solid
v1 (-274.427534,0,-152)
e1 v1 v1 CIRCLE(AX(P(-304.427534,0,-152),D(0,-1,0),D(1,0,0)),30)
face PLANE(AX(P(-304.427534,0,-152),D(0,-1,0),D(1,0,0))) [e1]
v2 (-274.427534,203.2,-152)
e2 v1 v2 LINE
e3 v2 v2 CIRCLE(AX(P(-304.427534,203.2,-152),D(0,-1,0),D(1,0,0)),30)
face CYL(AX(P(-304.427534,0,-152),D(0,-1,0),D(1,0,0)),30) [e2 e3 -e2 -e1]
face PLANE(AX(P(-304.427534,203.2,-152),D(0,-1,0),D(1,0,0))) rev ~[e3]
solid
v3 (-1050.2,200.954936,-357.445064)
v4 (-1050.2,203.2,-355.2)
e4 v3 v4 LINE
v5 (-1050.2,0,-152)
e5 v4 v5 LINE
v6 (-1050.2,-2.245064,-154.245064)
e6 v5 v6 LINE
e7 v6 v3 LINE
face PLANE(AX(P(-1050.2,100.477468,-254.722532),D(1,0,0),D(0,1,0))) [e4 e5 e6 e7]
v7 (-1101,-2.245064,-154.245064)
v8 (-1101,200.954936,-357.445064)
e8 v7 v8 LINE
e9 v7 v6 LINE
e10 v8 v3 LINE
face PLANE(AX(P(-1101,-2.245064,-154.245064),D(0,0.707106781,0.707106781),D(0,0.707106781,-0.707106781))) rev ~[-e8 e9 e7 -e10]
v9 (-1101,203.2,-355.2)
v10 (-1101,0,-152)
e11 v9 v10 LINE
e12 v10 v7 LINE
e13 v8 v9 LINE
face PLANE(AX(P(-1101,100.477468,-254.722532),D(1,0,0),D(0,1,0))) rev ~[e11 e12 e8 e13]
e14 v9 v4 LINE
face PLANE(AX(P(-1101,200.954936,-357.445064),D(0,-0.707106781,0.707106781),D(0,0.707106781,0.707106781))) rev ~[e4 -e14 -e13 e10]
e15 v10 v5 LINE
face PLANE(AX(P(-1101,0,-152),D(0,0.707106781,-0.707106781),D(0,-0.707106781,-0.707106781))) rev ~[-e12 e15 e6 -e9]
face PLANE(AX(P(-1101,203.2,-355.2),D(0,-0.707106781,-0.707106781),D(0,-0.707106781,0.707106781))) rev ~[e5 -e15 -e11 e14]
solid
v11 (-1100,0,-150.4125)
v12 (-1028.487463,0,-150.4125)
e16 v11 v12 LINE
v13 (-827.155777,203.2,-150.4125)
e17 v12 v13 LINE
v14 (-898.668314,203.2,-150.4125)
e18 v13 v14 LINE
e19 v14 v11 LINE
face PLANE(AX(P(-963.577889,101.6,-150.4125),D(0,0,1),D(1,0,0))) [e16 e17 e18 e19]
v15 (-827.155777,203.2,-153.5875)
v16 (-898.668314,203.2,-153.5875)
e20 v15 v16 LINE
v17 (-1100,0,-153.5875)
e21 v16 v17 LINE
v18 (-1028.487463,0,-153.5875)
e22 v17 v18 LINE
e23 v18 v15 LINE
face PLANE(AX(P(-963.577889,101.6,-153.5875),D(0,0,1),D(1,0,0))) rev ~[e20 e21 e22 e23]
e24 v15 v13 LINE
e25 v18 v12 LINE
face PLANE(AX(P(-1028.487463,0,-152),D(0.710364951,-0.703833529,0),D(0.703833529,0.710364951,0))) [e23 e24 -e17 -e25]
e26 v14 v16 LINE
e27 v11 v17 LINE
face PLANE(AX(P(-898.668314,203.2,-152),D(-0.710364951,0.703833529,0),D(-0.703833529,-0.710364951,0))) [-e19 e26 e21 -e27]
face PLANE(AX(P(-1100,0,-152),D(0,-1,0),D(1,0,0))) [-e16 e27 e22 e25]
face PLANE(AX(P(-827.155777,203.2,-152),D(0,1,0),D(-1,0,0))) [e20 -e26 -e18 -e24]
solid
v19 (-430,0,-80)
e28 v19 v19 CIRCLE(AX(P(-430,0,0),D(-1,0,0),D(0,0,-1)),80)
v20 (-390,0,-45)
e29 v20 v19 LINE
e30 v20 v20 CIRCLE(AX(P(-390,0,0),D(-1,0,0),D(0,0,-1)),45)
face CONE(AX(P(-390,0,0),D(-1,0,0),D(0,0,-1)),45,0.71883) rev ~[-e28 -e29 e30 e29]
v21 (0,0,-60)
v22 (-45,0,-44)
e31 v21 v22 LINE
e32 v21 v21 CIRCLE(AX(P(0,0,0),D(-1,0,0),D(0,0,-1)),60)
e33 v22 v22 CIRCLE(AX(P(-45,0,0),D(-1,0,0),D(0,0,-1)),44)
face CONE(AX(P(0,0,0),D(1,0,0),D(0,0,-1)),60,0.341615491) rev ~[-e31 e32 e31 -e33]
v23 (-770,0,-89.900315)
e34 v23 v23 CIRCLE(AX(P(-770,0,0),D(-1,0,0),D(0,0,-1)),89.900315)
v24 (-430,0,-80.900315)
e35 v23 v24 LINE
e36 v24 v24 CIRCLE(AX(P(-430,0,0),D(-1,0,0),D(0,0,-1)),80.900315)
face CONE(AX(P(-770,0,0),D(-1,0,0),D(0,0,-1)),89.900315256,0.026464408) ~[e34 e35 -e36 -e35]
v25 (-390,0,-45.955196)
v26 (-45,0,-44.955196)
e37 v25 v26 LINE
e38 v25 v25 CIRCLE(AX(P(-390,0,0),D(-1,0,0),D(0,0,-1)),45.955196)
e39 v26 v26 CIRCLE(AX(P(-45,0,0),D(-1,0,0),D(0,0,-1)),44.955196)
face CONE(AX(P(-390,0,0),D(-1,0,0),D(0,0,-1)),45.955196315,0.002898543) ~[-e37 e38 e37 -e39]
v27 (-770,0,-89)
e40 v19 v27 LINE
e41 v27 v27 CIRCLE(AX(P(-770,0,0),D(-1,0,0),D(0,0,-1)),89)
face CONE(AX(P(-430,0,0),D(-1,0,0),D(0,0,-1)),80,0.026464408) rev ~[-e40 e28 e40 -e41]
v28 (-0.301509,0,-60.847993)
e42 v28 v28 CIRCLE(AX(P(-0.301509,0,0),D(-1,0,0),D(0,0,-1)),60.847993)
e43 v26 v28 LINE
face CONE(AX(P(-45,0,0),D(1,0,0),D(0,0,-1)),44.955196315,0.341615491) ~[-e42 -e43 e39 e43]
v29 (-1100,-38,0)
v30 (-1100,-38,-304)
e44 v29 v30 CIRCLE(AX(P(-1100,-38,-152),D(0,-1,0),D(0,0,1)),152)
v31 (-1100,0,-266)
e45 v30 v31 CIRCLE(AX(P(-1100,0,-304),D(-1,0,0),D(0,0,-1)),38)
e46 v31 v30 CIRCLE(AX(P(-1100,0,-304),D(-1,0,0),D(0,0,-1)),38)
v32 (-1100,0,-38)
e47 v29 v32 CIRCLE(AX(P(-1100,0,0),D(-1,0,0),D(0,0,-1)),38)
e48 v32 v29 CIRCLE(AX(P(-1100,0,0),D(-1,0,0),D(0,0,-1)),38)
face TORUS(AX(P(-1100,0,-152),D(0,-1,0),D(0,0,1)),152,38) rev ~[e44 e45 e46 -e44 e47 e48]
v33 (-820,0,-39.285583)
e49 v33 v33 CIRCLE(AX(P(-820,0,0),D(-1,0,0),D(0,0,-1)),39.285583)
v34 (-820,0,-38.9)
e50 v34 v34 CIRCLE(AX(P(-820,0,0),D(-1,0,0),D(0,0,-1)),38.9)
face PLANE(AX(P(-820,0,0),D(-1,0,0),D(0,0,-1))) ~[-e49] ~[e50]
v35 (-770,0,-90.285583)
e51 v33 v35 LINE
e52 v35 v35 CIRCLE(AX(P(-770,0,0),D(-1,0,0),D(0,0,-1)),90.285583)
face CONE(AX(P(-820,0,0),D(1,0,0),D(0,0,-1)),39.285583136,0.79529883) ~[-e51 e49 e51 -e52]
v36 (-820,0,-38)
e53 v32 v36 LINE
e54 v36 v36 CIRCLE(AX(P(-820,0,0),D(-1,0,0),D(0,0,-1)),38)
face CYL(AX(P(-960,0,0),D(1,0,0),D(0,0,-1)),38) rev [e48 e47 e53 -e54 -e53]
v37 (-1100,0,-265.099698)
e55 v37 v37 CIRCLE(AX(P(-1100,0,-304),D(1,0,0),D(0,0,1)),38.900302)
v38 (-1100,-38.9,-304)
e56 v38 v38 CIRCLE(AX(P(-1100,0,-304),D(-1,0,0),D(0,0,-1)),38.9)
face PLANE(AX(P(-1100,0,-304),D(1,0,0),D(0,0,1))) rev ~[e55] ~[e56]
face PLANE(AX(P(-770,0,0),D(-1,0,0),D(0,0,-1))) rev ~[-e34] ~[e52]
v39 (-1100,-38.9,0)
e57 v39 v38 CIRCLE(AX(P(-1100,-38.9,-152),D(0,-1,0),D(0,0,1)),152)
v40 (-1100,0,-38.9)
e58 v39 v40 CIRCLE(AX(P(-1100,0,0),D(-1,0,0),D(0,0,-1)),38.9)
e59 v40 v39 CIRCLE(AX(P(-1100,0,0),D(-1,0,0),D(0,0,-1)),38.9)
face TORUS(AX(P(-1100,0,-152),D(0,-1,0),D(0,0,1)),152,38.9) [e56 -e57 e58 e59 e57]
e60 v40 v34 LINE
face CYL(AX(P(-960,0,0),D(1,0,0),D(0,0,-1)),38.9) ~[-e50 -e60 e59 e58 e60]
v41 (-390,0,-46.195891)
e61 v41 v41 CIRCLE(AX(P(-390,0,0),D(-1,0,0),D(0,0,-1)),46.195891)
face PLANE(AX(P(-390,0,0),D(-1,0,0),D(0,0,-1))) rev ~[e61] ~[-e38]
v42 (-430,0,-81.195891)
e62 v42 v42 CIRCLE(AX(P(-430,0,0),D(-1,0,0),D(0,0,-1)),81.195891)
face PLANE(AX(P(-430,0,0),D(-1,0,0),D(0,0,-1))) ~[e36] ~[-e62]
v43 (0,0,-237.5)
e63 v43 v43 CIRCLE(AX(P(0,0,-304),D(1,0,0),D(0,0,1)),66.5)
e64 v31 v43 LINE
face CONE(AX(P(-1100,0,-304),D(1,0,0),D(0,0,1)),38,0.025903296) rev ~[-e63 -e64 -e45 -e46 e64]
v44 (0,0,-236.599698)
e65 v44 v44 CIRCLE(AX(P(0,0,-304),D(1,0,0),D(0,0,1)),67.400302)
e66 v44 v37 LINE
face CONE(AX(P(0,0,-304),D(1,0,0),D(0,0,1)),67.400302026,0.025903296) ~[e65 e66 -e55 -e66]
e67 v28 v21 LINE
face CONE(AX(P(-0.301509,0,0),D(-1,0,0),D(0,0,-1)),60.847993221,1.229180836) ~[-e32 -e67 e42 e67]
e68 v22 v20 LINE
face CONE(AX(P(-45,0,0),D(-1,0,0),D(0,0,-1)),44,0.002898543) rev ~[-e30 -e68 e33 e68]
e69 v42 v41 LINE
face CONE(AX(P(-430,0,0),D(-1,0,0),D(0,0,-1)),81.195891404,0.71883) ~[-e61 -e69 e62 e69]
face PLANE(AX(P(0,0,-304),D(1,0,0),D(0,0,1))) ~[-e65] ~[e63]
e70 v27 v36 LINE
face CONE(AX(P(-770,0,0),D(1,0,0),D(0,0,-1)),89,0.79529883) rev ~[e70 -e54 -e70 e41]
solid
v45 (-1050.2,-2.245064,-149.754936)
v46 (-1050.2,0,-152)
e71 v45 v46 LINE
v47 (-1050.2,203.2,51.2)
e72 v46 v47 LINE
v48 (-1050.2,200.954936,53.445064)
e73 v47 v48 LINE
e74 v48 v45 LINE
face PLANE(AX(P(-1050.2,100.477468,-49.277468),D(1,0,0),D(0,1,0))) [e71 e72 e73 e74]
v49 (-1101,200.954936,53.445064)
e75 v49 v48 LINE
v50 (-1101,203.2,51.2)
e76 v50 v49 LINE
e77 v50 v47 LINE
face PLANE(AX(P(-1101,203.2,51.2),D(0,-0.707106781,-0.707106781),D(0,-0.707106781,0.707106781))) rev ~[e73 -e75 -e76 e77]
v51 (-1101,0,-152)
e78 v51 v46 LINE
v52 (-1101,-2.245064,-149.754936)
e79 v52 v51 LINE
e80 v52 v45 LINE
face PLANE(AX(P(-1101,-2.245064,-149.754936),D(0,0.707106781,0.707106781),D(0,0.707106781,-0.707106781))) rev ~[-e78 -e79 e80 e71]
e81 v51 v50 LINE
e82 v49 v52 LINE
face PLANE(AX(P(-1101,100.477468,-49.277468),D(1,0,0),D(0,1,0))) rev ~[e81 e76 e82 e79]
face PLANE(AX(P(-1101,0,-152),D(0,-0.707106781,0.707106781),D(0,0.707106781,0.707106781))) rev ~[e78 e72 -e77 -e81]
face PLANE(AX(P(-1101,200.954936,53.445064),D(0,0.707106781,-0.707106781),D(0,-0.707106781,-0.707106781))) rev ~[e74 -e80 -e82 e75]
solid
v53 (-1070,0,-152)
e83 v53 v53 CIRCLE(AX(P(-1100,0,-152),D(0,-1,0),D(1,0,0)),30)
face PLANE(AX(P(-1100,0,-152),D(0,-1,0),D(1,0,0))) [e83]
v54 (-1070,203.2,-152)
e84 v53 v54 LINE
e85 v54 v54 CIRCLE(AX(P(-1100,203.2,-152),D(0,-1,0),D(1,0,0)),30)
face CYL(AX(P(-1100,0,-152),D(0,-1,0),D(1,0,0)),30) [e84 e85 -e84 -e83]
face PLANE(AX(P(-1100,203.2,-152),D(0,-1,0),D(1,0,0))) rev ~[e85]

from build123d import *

# Parameters (mm, degrees)
F0_W        = 280
F0_H        = 0.9
F1_FACE_R   = 38.9
F1_FACE_R_2 = 38
F0_R        = 30
F4_DEPTH    = 203.2
F7_DEPTH    = 50.8
F10_DEPTH   = 1.5875


# Not quite as in the source:
# - a length typed as a fraction of an inch, garbled in the dataset ("3 / 203.2 mm" for 3/8 in), is restored


with BuildPart() as f1:
    # F0 (on Front) → F1 (revolve)
    with BuildSketch(Plane.XZ):
        Polygon((-0.3015087009, -60.8479932213), (0, -60), (-45, -44), (-45, -44.9551963149), align=None)
        Polygon((-45, -44.9551963149), (-45, -44), (-390, -45), (-390, -45.9551963149), align=None)
        Polygon((-390, -45.9551963149), (-390, -45), (-430, -80), (-430, -80.9003152562), (-430, -81.1958914039), (-390, -46.1958914039), align=None)
        Polygon((-430, -80.9003152562), (-430, -80), (-770, -89), (-770, -89.9003152562), align=None)
        Polygon((-770, -89.9003152562), (-770, -89), (-820, -38), (-820, -38.9), (-820, -39.2855831362), (-770, -90.2855831362), align=None)
        with Locations((-960, -38.45)):
            Rectangle(F0_W, F0_H)
    revolve(axis=Axis((-550, 0, 0), (-1, 0, 0)))

    # F2: sweep along a path in F0
    with BuildLine(Plane.XZ) as f2_path:
        ThreePointArc((-1100, -38.9), (-1213.1, -152), (-1100, -265.1))
    # F1_face (on face) → F2 (sweep)
    with BuildSketch(Plane(origin=(-1100, 0, 0), x_dir=(0, -1, 0), z_dir=(-1, 0, 0))):
        Circle(F1_FACE_R)
        Circle(F1_FACE_R_2, mode=Mode.SUBTRACT)
    sweep(path=f2_path.line)

    # F0 (on Front) → F3 (revolve)
    with BuildSketch(Plane.XZ):
        Polygon((-1100, -265.1), (-1100, -266), (0, -237.5), (0, -236.5996979742), (-1100, -265.0996979742), align=None)
    revolve(axis=Axis((-383.8686078787, 0, -304), (1, 0, 0)))


with BuildPart() as f4:
    # F0 (on Front) → F4 (new body)
    with BuildSketch(Plane.XZ):
        with Locations((-1100, -152)):
            Circle(F0_R)
    extrude(amount=-F4_DEPTH)


with BuildPart() as f4b:
    # F0 (on Front) → F4, piece 2 (new body)
    with BuildSketch(Plane.XZ):
        with Locations((-304.4275343418, -152)):
            Circle(F0_R)
    extrude(amount=-F4_DEPTH)


with BuildPart() as f7:
    # F6 (on offset) → F7 (new body)
    with BuildSketch(Plane.YZ.offset(-1101)):
        Polygon((-2.2450640303, -149.7549359697), (0, -152), (203.2, 51.2), (200.9549359697, 53.4450640303), align=None)
    extrude(amount=F7_DEPTH)


with BuildPart() as f7b:
    # F6 (on offset) → F7, piece 2 (new body)
    with BuildSketch(Plane.YZ.offset(-1101)):
        Polygon((203.2, -355.2), (0, -152), (-2.2450640303, -154.2450640303), (200.9549359697, -357.4450640303), align=None)
    extrude(amount=F7_DEPTH)


with BuildPart() as f10:
    # F9 (on offset) → F10 (new body, symmetric)
    with BuildSketch(Plane.XY.offset(-152)):
        Polygon((-1100, 0), (-1028.4874627811, 0), (-827.1557770688, 203.2), (-898.6683142877, 203.2), align=None)
    extrude(amount=F10_DEPTH, both=True)


solid = Compound([f1.part, f4.part, f4b.part, f7.part, f7b.part, f10.part])
